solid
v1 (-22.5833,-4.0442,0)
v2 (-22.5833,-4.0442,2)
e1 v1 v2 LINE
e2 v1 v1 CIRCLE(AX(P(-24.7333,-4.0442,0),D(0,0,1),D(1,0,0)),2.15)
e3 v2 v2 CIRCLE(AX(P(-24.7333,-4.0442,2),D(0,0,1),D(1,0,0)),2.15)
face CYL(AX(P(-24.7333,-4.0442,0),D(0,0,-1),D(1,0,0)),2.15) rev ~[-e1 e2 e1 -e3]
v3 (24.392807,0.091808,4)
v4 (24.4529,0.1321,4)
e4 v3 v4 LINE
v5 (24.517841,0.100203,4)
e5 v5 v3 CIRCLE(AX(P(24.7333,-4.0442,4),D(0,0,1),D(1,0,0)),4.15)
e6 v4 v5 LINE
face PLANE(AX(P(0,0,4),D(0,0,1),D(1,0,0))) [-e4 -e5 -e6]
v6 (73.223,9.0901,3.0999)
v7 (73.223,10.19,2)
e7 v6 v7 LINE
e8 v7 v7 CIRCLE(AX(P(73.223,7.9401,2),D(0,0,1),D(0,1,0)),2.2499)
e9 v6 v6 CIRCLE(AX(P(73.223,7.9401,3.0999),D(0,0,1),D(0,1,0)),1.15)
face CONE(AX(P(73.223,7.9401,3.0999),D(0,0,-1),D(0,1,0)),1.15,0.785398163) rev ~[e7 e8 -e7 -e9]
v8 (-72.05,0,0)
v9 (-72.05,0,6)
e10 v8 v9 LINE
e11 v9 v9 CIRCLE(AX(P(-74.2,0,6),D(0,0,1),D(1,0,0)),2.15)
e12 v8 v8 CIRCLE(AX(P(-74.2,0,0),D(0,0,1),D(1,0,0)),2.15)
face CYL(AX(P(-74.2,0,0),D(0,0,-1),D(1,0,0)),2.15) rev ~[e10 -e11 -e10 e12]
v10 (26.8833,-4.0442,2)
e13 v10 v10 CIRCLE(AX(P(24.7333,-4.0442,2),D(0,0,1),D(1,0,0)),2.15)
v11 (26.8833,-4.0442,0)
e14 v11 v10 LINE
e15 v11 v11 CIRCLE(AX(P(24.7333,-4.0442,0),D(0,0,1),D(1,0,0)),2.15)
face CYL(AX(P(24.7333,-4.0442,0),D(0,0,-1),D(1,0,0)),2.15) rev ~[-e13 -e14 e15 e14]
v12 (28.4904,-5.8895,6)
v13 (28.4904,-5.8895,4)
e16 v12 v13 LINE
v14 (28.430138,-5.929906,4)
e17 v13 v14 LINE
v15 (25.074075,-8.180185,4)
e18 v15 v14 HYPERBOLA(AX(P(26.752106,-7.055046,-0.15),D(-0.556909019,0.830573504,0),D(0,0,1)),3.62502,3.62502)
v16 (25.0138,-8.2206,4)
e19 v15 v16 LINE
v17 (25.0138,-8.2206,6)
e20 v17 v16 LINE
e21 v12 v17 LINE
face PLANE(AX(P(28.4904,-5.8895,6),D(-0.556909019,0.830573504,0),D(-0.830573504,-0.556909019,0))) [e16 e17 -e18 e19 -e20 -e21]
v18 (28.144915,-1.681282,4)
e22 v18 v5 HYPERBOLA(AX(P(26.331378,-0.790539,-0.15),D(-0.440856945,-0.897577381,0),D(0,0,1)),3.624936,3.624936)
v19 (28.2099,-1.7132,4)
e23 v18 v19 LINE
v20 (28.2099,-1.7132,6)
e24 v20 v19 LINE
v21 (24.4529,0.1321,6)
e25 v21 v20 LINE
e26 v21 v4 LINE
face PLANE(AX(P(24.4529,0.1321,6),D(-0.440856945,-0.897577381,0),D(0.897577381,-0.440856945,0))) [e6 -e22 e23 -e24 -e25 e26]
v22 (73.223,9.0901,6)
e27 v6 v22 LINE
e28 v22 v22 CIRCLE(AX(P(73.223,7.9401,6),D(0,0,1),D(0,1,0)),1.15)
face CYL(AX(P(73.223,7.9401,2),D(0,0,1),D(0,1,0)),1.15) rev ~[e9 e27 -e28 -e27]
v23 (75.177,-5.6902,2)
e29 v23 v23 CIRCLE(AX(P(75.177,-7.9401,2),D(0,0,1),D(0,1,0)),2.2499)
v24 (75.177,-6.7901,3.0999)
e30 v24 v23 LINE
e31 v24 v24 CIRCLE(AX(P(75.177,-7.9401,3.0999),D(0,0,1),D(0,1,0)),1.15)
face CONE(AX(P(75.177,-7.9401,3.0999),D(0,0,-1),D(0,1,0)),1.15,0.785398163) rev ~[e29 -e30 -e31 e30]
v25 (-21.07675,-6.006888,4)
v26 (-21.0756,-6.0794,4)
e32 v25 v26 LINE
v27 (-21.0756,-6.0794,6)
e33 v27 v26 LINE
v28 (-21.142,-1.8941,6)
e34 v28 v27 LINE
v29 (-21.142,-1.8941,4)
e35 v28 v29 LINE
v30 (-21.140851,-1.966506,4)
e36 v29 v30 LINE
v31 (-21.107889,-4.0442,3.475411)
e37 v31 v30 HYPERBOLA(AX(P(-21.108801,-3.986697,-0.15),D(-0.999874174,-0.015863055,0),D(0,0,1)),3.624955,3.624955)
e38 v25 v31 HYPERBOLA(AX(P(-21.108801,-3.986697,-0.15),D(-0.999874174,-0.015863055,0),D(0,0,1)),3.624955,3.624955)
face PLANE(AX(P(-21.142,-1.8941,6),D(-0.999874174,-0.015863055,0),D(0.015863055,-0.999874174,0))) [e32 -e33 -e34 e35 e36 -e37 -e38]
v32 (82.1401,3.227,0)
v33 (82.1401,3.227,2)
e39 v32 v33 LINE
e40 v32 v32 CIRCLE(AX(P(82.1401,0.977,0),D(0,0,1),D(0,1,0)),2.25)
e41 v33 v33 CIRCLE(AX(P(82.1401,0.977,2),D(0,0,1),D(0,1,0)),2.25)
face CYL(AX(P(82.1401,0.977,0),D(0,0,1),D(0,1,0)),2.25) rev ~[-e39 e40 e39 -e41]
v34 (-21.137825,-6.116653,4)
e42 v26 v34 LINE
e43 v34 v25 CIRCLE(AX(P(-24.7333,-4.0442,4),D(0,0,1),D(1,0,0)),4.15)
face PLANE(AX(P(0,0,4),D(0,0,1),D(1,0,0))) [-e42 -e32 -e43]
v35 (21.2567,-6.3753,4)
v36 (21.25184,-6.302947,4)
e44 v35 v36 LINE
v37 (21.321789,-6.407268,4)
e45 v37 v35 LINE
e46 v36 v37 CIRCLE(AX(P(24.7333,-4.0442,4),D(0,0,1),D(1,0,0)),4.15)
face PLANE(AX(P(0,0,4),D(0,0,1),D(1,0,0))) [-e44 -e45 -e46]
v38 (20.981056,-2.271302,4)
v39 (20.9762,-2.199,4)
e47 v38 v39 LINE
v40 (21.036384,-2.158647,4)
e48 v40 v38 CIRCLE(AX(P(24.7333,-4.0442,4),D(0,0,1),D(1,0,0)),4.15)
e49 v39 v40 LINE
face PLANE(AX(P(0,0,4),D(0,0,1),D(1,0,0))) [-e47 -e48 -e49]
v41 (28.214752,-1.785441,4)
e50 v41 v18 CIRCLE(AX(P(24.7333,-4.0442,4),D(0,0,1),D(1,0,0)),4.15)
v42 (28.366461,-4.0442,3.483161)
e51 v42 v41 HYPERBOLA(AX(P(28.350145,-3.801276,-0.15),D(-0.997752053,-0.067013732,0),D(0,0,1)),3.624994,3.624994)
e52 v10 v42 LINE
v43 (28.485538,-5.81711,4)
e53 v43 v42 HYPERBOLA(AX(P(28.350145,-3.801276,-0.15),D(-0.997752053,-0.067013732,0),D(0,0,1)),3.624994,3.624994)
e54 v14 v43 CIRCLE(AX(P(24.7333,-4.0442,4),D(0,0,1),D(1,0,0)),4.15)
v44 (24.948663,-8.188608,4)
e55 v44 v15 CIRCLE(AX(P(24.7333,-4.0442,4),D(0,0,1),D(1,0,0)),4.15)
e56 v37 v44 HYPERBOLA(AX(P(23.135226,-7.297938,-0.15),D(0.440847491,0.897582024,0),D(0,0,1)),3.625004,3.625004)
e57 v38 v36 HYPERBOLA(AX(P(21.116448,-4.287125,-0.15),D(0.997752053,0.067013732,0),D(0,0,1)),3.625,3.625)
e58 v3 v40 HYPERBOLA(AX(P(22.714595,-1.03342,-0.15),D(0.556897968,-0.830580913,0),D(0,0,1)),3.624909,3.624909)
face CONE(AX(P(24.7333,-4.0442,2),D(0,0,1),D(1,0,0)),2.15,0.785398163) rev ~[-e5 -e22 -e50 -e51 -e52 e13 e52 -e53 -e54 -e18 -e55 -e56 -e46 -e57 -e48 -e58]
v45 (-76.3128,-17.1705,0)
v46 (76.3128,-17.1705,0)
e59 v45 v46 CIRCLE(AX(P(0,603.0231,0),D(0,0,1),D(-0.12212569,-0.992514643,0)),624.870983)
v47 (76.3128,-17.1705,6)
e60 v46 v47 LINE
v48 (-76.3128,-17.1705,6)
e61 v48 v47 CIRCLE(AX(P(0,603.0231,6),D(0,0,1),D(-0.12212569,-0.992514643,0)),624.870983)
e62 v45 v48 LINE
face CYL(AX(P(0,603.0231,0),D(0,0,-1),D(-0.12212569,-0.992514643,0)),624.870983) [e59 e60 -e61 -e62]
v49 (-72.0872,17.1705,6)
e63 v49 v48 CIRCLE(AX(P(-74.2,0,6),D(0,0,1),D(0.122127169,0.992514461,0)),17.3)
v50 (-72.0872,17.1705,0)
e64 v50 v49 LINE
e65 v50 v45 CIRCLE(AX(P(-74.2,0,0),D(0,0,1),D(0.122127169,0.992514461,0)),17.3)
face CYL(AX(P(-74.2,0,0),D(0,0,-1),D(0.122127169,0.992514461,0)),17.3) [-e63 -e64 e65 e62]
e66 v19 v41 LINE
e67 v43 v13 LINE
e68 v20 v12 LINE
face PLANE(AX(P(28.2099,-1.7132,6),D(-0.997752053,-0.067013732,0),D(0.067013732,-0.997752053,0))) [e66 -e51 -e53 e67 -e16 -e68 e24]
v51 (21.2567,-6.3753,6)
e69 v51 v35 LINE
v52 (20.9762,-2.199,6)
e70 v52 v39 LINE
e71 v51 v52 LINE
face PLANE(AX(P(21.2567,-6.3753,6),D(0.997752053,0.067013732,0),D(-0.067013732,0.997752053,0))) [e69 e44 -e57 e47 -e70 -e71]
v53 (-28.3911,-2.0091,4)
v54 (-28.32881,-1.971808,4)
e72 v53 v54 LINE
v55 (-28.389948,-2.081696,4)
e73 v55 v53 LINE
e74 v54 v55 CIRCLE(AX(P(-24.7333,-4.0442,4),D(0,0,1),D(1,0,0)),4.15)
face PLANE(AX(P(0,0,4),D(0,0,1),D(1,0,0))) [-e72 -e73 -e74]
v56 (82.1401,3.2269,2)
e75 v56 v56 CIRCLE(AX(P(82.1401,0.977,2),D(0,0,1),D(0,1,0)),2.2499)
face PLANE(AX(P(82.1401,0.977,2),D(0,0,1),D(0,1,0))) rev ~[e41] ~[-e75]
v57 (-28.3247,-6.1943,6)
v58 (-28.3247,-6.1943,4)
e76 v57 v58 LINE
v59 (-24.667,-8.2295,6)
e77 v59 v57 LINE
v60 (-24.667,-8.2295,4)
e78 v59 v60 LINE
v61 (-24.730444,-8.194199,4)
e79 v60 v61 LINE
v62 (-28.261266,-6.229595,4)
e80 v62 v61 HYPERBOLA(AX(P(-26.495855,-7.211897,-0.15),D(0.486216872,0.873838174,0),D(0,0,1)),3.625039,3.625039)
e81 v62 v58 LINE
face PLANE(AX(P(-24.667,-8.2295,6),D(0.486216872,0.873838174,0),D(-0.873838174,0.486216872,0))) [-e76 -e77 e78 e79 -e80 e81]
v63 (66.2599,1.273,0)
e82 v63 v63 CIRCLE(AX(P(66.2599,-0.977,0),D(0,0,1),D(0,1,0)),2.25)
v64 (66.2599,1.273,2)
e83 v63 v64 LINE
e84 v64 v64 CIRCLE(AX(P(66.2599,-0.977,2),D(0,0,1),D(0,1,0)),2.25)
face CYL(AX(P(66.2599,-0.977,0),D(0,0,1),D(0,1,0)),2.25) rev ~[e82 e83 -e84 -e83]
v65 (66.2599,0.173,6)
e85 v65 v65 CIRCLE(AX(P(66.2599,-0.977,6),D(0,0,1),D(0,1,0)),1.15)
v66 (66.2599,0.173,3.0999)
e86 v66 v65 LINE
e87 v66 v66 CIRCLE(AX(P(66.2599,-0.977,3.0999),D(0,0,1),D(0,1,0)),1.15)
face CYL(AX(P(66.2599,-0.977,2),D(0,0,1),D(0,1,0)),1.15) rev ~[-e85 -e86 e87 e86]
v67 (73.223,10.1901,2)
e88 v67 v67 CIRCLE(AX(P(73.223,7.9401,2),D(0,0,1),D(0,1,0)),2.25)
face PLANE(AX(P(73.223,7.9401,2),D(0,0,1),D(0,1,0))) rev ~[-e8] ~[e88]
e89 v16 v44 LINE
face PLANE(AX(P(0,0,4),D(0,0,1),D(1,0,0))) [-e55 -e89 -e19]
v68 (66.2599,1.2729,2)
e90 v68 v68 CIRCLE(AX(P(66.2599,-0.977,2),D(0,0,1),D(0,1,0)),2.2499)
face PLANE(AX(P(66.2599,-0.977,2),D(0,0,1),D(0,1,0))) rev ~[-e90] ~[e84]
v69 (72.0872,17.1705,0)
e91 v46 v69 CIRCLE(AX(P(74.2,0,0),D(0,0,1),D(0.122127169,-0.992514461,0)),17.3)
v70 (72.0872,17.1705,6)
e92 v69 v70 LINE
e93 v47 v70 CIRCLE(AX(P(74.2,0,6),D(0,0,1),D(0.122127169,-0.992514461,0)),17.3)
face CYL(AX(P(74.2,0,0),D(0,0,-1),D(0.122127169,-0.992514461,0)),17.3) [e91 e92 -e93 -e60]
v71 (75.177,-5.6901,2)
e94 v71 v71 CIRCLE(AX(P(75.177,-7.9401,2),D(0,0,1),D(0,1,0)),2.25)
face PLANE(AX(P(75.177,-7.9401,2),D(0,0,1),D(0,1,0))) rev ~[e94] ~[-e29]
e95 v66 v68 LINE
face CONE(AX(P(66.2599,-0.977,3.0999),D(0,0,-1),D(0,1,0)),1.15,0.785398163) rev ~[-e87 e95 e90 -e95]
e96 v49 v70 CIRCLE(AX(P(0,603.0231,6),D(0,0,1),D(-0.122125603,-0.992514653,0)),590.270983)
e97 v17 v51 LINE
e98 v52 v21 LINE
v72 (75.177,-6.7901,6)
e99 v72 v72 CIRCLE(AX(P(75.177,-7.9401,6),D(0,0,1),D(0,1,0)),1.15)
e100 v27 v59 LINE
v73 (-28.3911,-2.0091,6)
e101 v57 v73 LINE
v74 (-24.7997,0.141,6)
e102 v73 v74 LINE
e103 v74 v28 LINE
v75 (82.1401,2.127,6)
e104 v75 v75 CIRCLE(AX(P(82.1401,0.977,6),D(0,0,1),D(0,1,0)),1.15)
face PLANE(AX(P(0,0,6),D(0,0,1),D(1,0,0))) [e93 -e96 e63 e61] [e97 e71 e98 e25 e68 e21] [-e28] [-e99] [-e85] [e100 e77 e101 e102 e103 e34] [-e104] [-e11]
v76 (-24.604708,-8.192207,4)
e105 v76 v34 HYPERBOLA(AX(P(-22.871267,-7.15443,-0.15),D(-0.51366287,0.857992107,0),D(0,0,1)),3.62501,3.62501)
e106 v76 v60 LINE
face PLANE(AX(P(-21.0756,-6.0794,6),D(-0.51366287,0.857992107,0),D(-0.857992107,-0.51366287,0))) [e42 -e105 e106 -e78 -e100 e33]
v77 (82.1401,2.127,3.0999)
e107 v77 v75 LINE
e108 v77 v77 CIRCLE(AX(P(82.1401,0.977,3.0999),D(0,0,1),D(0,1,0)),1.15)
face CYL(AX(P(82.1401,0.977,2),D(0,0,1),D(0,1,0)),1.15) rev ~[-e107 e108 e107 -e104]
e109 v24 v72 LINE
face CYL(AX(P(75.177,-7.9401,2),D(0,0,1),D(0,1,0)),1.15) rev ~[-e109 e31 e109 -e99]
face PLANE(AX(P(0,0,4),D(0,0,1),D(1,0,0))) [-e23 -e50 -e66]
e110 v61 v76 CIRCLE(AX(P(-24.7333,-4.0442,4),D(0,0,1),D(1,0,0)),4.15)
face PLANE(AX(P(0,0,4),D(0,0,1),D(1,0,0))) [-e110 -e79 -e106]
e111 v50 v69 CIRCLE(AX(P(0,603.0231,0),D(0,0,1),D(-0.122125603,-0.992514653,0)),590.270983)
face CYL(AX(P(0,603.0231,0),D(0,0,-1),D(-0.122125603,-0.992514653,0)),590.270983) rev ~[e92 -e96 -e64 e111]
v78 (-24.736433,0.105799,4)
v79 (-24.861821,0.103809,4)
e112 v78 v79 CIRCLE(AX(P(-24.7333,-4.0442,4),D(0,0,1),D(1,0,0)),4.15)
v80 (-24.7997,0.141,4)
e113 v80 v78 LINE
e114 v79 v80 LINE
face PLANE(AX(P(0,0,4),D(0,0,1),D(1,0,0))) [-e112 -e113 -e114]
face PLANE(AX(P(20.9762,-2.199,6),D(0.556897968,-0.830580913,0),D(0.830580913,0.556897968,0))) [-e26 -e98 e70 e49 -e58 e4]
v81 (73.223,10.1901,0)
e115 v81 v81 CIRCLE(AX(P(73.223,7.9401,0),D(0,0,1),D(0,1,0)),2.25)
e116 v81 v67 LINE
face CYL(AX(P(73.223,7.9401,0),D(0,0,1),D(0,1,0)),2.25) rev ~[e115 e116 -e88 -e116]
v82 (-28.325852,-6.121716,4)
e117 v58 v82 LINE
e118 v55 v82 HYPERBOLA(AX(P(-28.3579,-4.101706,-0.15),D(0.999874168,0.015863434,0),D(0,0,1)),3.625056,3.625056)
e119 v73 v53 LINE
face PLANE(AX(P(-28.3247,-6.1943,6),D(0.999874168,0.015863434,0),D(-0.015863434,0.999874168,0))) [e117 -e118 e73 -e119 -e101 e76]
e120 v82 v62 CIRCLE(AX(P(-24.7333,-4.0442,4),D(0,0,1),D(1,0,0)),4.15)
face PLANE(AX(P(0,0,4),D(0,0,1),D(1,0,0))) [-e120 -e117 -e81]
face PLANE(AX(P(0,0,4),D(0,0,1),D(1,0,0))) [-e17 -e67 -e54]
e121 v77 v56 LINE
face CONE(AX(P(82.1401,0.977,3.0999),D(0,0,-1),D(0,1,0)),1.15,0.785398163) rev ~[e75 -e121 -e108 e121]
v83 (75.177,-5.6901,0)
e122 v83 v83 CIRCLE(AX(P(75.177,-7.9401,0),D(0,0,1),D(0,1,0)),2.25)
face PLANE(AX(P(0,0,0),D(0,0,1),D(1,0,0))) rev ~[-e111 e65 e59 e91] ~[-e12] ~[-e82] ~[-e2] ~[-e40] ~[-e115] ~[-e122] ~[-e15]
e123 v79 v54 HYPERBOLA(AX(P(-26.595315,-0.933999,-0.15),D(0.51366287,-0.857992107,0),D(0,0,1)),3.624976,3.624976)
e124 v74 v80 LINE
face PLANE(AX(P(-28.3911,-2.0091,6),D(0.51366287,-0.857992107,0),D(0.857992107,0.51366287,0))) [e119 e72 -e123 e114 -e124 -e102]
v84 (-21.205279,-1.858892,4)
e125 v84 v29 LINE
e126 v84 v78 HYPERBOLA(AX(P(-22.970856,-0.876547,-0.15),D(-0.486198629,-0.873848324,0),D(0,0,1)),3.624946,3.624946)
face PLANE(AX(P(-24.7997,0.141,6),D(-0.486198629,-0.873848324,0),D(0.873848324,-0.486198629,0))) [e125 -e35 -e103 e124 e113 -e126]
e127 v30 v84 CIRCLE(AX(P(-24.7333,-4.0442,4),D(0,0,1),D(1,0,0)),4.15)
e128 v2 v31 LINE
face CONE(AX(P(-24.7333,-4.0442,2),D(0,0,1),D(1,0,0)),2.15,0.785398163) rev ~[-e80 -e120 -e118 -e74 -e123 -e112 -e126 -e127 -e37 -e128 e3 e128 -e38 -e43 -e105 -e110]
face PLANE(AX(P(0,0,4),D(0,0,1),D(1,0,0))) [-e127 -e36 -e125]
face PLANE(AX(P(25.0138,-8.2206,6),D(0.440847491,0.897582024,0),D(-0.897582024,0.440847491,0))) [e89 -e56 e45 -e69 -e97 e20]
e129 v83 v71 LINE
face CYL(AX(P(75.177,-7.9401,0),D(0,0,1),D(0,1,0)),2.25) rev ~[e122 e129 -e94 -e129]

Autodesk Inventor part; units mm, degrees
ref_plane "YZ Plane" through (0, 0, 0) normal (1, 0, 0) x (0, 1, 0)
ref_plane "XZ Plane" through (0, 0, 0) normal (0, 1, 0) x (-1, 0, 0)
ref_plane "XY Plane" through (0, 0, 0) normal (0, 0, 1) x (1, 0, 0)
sketch "Sketch1" plane through (0, 0, 0) normal (0, 0, 1) x (1, 0, 0)
  arc A0 (-74.2, 0) -> (74.2, 0) centre (0, 603.0231) ccw construction
  arc A1 (-76.3128, -17.1705) -> (76.3128, -17.1705) centre (0, 603.0231) ccw
  arc A2 (-72.0872, 17.1705) -> (72.0872, 17.1705) centre (0, 603.0231) ccw
  arc A3 (-72.0872, 17.1705) -> (-76.3128, -17.1705) centre (-74.2, 0) ccw
  arc A4 (76.3128, -17.1705) -> (72.0872, 17.1705) centre (74.2, 0) ccw
  line L0 (-159.9202, 0) -> (186.0645, 0) construction
  line L1 (0, 827.4607) -> (0, -503.7998) construction
  line L2 (74.2, 0) -> (74.2, 0) construction
  line L3 (74.2, 0) -> (91.3705, 2.1128) construction
  line L4 (74.2, 0) -> (72.0872, 17.1705) construction
  circle A5 centre (74.2, 0) radius 8 construction
  circle A6 centre (73.223, 7.9401) radius 1.15
  circle A7 centre (66.2599, -0.977) radius 1.15
  circle A8 centre (75.177, -7.9401) radius 1.15
  circle A9 centre (82.1401, 0.977) radius 1.15
  circle A10 centre (-74.2, 0) radius 2.15
  circle A11 centre (-24.7333, -4.0442) radius 2.15
  circle A12 centre (24.7333, -4.0442) radius 2.15
  point P0 (0, 0)
  dimension "d3" = 16
  dimension "d0" = 148.4
  dimension "d1" = 34.6
  dimension "d2" = 603.0231
  dimension "d4" = 2.3
  dimension "d7" = 360
  dimension "d9" = 49.4667
  dimension "d10" = 24.7333
  dimension "d11" = 4.3
  dimension "d12" = 4.3
  dimension "d13" = 4.3
  dimension "d46" = 7.015
extrude "Extrusion1" add sketch "Sketch1" along normal blind 6 contours A3 A2 A4 A1 | A6 | A7 | A8 | A9
sketch "Sketch2" plane through (0, 0, 6) normal (0, 0, 1) x (1, 0, 0)
  circle A0 centre (-24.7333, -4.0442) radius 2.15 projected
  line L0 (-21.0756, -6.0794) -> (-24.667, -8.2295)
  line L1 (-24.667, -8.2295) -> (-28.3247, -6.1943)
  line L2 (-28.3247, -6.1943) -> (-28.3911, -2.0091)
  line L3 (-28.3911, -2.0091) -> (-24.7997, 0.141)
  line L4 (-24.7997, 0.141) -> (-21.142, -1.8941)
  line L5 (-21.142, -1.8941) -> (-21.0756, -6.0794)
  circle A1 centre (24.7333, -4.0442) radius 2.15 projected
  line L6 (21.2567, -6.3753) -> (20.9762, -2.199)
  line L7 (20.9762, -2.199) -> (24.4529, 0.1321)
  line L8 (24.4529, 0.1321) -> (28.2099, -1.7132)
  line L9 (28.2099, -1.7132) -> (28.4904, -5.8895)
  line L10 (28.4904, -5.8895) -> (25.0138, -8.2206)
  line L11 (25.0138, -8.2206) -> (21.2567, -6.3753)
  point P0 (0, 0)
  dimension "d16" = 7.25
  dimension "d22" = 7.25
extrude "Extrusion2" cut sketch "Sketch2" against normal blind 2
chamfer "Chamfer1" distance 2 angle 45 2 edges at (-26.8833, -4.0442, 4) (22.5833, -4.0442, 4)
sketch "Sketch4" plane through (0, 0, 0) normal (0, 0, -1) x (-1, 0, 0)
  line L0 (-73.223, 7.9401) -> (-75.177, -7.9401) construction
  circle A0 centre (-74.2, 0) radius 8 construction
  line L1 (-66.2, 0) -> (-95.5949, 0) construction
  line L2 (-66.2, 0) -> (0, 0) construction
  circle A1 centre (-75.177, -7.9401) radius 1.15 construction
  circle A2 centre (-66.2599, -0.977) radius 1.15 construction
  circle A3 centre (-73.223, 7.9401) radius 1.15 construction
  circle A4 centre (-82.1401, 0.977) radius 1.15 construction
  dimension "d28" = 82.985
  dimension "d29" = 16
  dimension "d30" = 2.3
  dimension "d31" = 74.2
  dimension "d34" = 360
hole "Hole1" at (75.177, -7.9401, 0) at (82.1401, 0.977, 0) at (73.223, 7.9401, 0) at (66.2599, -0.977, 0) direction (0, 0, 1) diameter 2.3 end through all counterbore diameter 4.5 counterbore depth 2
chamfer "Chamfer2" distance 1.1 angle 45 4 edges at (75.177, -9.0901, 2) (82.1401, -0.173, 2) (66.2599, -2.127, 2) (73.223, 6.7901, 2)
equation "\"d9\" = 0.333333 * d0"
equation "\"d10\" = 0.5 * d9"
equation "\"d22\" = d16"
properties part number "Arm 12X"
